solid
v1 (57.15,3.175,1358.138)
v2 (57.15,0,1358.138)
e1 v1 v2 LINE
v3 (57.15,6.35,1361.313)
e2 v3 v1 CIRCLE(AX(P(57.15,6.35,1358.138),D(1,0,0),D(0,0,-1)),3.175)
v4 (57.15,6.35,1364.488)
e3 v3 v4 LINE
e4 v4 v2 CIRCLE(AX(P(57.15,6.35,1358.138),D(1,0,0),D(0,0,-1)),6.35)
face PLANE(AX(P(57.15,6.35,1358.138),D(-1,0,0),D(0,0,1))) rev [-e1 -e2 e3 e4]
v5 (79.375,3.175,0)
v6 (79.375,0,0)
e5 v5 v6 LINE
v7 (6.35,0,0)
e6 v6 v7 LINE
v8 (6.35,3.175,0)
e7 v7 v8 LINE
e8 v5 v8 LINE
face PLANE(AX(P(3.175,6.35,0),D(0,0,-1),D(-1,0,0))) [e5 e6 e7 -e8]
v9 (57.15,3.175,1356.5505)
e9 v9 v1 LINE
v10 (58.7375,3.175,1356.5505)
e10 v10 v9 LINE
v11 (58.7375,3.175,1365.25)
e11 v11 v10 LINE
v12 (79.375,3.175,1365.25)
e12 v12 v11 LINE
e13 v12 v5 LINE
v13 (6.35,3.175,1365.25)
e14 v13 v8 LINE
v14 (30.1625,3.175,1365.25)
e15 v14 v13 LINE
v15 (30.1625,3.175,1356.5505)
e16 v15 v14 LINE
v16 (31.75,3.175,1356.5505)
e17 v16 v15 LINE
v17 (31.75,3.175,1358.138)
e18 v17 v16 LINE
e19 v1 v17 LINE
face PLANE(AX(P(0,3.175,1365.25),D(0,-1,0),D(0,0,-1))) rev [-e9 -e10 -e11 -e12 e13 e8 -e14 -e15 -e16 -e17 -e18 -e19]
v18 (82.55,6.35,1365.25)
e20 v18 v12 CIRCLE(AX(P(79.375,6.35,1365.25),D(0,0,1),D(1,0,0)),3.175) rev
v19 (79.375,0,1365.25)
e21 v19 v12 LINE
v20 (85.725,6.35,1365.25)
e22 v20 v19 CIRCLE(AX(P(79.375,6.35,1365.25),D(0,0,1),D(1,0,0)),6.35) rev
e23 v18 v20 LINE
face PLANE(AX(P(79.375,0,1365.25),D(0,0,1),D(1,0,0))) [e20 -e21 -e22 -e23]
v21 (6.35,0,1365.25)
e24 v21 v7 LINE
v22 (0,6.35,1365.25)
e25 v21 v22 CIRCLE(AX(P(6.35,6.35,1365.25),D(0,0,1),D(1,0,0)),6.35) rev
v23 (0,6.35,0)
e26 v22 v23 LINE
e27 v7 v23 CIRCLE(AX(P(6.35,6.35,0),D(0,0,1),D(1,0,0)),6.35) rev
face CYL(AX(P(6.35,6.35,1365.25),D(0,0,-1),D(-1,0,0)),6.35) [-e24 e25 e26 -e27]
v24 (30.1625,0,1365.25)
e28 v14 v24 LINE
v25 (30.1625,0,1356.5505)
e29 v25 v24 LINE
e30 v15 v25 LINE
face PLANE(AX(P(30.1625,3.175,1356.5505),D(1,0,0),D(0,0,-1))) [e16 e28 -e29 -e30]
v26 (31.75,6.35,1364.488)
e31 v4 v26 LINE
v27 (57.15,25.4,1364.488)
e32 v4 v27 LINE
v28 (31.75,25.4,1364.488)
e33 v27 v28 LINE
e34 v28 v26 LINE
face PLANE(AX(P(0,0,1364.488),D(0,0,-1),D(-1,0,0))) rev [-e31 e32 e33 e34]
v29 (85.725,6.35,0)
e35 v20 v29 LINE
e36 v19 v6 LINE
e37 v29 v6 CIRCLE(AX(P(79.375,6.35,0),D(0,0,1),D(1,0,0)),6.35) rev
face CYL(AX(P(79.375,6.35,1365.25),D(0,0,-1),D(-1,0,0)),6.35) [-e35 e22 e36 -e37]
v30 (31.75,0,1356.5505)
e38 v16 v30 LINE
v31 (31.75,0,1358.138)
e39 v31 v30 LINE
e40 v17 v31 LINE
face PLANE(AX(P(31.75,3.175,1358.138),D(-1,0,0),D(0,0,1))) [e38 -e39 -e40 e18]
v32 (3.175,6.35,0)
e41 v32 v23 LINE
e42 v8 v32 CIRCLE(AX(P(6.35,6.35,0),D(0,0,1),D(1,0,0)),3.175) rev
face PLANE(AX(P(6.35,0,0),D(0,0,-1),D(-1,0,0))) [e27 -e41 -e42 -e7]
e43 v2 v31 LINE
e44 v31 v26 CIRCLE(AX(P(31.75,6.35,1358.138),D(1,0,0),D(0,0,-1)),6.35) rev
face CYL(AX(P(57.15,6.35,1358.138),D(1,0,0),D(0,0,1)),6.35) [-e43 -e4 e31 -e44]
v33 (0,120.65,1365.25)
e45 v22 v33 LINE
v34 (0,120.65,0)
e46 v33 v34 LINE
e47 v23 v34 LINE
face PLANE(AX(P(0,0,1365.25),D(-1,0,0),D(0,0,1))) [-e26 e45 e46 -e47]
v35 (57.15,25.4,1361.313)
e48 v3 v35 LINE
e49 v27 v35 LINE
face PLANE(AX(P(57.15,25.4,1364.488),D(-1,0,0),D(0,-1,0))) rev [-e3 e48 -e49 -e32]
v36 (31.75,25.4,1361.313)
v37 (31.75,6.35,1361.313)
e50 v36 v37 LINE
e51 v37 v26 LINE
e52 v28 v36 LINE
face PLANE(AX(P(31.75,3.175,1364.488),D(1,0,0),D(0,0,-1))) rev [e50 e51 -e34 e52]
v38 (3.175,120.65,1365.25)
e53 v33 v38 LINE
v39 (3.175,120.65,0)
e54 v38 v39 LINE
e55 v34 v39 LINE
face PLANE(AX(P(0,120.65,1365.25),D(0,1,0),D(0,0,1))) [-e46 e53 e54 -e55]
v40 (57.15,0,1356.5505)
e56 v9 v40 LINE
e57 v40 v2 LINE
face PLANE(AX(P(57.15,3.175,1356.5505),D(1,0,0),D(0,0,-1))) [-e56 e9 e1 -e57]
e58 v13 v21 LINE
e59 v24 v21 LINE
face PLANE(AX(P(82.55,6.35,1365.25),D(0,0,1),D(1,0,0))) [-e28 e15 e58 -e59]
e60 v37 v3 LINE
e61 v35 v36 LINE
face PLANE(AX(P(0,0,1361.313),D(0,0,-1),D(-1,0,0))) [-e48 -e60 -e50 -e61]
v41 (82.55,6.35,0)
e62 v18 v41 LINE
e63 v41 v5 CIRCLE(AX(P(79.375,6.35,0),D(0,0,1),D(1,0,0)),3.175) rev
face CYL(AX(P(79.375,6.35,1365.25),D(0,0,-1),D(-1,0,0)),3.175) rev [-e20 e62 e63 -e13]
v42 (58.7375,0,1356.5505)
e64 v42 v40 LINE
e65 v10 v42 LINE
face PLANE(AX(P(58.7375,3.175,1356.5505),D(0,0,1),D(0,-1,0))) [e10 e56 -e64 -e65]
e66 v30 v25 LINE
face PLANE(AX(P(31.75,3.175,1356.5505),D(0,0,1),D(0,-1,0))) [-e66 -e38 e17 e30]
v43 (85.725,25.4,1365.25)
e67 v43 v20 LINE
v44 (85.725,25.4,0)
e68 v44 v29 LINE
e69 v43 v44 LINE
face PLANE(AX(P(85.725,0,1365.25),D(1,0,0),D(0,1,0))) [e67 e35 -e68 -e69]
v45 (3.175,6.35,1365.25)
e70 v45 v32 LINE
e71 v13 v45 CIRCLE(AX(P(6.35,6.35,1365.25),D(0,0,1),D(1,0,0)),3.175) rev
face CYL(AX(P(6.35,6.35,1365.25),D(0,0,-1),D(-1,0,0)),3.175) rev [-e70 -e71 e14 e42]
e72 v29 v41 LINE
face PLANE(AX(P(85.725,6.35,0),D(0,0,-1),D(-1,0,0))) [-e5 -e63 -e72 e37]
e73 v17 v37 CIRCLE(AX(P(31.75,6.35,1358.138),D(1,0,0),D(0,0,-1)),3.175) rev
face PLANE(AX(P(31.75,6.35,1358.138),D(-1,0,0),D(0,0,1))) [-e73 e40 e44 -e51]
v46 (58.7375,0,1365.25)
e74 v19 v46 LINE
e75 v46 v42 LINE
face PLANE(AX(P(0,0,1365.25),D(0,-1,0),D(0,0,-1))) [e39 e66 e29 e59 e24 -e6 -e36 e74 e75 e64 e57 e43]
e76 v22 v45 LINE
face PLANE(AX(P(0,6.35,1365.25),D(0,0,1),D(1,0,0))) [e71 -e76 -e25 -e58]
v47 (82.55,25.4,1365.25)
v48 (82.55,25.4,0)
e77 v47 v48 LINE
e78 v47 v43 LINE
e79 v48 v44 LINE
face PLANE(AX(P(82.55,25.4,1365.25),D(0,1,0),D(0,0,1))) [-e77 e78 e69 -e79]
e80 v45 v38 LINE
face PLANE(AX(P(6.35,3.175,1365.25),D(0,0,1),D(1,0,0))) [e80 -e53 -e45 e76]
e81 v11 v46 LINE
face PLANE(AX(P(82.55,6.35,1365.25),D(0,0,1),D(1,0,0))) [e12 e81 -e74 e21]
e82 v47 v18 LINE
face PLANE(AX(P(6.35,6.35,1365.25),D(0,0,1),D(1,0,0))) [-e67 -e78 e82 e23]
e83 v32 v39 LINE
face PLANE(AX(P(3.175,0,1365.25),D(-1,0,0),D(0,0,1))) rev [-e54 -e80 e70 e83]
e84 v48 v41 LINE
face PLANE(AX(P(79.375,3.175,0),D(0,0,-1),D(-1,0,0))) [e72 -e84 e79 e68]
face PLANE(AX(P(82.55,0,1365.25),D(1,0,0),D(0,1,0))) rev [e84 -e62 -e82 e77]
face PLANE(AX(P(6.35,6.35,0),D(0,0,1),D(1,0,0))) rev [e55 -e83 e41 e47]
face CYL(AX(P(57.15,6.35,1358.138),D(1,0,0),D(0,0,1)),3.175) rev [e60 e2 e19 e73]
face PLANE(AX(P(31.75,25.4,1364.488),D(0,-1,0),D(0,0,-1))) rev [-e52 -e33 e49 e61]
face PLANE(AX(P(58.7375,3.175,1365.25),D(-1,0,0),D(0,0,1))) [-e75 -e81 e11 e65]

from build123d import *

# Parameters (mm, degrees)
BASE_FLANGE1_DEPTH            = 1365.25
EDGE_FLANGE1_STRIP_W          = 19.812
EDGE_FLANGE1_STRIP_H          = 3.175
EDGE_FLANGE1_STRIP_CUT_DEPTH  = 25.4
EDGE_FLANGE1_RELIEF_W         = 21.3995
EDGE_FLANGE1_RELIEF_H         = 1.5875
EDGE_FLANGE1_RELIEF_CUT_DEPTH = 3.175
EDGE_FLANGE1_DEPTH            = 25.4


# Sheet-metal steps are written as plain solids
with BuildPart() as part:
    # Sketch1 → Base-Flange1 (new body)
    with BuildSketch(Plane.XY):
        with BuildLine():
            Line((0, 120.65), (0, 6.35))
            ThreePointArc((0, 6.35), (1.859871939, 1.859871939), (6.35, 0))
            Line((6.35, 0), (79.375, 0))
            ThreePointArc((79.375, 0), (83.865128061, 1.859871939), (85.725, 6.35))
            Line((85.725, 6.35), (85.725, 25.4))
            Line((85.725, 25.4), (82.55, 25.4))
            Line((82.55, 25.4), (82.55, 6.35))
            ThreePointArc((82.55, 6.35), (81.62006403, 4.10493597), (79.375, 3.175))
            Line((79.375, 3.175), (6.35, 3.175))
            ThreePointArc((6.35, 3.175), (4.10493597, 4.10493597), (3.175, 6.35))
            Line((3.175, 6.35), (3.175, 120.65))
            Line((3.175, 120.65), (0, 120.65))
        make_face()
    extrude(amount=BASE_FLANGE1_DEPTH)

    # Edge-Flange1 strip (across the edge) → Edge-Flange1 strip cut (cut)
    with BuildSketch(Plane(origin=(31.75, 3.175, 1364.488), x_dir=(0, 0, -1), z_dir=(1, 0, 0))):
        with Locations((-3.556, -1.5875)):
            Rectangle(EDGE_FLANGE1_STRIP_W, EDGE_FLANGE1_STRIP_H)
    extrude(amount=EDGE_FLANGE1_STRIP_CUT_DEPTH, mode=Mode.SUBTRACT)

    # Edge-Flange1 relief (on the sheet) → Edge-Flange1 relief cut (cut)
    with BuildSketch(Plane(origin=(31.75, 3.175, 1358.138), x_dir=(0, 0, -1), z_dir=(0, 1, 0))):
        with Locations((-9.11225, 0.79375)):
            Rectangle(EDGE_FLANGE1_RELIEF_W, EDGE_FLANGE1_RELIEF_H)
        with Locations((-9.11225, -26.19375)):
            Rectangle(EDGE_FLANGE1_RELIEF_W, EDGE_FLANGE1_RELIEF_H)
    extrude(amount=-EDGE_FLANGE1_RELIEF_CUT_DEPTH, mode=Mode.SUBTRACT)

    # Edge-Flange1 section (across the edge) → Edge-Flange1 (add)
    with BuildSketch(Plane(origin=(31.75, 3.175, 1364.488), x_dir=(0, 0, -1), z_dir=(1, 0, 0))):
        with BuildLine():
            Line((0, 3.175), (0, 22.225))
            Line((0, 22.225), (3.175, 22.225))
            Line((3.175, 22.225), (3.175, 3.175))
            ThreePointArc((3.175, 3.175), (4.10493597, 0.92993597), (6.35, 0))
            Line((6.35, 0), (6.35, -3.175))
            ThreePointArc((6.35, -3.175), (1.859871939, -1.315128061), (0, 3.175))
        make_face()
    extrude(amount=EDGE_FLANGE1_DEPTH)


solid = part.part
